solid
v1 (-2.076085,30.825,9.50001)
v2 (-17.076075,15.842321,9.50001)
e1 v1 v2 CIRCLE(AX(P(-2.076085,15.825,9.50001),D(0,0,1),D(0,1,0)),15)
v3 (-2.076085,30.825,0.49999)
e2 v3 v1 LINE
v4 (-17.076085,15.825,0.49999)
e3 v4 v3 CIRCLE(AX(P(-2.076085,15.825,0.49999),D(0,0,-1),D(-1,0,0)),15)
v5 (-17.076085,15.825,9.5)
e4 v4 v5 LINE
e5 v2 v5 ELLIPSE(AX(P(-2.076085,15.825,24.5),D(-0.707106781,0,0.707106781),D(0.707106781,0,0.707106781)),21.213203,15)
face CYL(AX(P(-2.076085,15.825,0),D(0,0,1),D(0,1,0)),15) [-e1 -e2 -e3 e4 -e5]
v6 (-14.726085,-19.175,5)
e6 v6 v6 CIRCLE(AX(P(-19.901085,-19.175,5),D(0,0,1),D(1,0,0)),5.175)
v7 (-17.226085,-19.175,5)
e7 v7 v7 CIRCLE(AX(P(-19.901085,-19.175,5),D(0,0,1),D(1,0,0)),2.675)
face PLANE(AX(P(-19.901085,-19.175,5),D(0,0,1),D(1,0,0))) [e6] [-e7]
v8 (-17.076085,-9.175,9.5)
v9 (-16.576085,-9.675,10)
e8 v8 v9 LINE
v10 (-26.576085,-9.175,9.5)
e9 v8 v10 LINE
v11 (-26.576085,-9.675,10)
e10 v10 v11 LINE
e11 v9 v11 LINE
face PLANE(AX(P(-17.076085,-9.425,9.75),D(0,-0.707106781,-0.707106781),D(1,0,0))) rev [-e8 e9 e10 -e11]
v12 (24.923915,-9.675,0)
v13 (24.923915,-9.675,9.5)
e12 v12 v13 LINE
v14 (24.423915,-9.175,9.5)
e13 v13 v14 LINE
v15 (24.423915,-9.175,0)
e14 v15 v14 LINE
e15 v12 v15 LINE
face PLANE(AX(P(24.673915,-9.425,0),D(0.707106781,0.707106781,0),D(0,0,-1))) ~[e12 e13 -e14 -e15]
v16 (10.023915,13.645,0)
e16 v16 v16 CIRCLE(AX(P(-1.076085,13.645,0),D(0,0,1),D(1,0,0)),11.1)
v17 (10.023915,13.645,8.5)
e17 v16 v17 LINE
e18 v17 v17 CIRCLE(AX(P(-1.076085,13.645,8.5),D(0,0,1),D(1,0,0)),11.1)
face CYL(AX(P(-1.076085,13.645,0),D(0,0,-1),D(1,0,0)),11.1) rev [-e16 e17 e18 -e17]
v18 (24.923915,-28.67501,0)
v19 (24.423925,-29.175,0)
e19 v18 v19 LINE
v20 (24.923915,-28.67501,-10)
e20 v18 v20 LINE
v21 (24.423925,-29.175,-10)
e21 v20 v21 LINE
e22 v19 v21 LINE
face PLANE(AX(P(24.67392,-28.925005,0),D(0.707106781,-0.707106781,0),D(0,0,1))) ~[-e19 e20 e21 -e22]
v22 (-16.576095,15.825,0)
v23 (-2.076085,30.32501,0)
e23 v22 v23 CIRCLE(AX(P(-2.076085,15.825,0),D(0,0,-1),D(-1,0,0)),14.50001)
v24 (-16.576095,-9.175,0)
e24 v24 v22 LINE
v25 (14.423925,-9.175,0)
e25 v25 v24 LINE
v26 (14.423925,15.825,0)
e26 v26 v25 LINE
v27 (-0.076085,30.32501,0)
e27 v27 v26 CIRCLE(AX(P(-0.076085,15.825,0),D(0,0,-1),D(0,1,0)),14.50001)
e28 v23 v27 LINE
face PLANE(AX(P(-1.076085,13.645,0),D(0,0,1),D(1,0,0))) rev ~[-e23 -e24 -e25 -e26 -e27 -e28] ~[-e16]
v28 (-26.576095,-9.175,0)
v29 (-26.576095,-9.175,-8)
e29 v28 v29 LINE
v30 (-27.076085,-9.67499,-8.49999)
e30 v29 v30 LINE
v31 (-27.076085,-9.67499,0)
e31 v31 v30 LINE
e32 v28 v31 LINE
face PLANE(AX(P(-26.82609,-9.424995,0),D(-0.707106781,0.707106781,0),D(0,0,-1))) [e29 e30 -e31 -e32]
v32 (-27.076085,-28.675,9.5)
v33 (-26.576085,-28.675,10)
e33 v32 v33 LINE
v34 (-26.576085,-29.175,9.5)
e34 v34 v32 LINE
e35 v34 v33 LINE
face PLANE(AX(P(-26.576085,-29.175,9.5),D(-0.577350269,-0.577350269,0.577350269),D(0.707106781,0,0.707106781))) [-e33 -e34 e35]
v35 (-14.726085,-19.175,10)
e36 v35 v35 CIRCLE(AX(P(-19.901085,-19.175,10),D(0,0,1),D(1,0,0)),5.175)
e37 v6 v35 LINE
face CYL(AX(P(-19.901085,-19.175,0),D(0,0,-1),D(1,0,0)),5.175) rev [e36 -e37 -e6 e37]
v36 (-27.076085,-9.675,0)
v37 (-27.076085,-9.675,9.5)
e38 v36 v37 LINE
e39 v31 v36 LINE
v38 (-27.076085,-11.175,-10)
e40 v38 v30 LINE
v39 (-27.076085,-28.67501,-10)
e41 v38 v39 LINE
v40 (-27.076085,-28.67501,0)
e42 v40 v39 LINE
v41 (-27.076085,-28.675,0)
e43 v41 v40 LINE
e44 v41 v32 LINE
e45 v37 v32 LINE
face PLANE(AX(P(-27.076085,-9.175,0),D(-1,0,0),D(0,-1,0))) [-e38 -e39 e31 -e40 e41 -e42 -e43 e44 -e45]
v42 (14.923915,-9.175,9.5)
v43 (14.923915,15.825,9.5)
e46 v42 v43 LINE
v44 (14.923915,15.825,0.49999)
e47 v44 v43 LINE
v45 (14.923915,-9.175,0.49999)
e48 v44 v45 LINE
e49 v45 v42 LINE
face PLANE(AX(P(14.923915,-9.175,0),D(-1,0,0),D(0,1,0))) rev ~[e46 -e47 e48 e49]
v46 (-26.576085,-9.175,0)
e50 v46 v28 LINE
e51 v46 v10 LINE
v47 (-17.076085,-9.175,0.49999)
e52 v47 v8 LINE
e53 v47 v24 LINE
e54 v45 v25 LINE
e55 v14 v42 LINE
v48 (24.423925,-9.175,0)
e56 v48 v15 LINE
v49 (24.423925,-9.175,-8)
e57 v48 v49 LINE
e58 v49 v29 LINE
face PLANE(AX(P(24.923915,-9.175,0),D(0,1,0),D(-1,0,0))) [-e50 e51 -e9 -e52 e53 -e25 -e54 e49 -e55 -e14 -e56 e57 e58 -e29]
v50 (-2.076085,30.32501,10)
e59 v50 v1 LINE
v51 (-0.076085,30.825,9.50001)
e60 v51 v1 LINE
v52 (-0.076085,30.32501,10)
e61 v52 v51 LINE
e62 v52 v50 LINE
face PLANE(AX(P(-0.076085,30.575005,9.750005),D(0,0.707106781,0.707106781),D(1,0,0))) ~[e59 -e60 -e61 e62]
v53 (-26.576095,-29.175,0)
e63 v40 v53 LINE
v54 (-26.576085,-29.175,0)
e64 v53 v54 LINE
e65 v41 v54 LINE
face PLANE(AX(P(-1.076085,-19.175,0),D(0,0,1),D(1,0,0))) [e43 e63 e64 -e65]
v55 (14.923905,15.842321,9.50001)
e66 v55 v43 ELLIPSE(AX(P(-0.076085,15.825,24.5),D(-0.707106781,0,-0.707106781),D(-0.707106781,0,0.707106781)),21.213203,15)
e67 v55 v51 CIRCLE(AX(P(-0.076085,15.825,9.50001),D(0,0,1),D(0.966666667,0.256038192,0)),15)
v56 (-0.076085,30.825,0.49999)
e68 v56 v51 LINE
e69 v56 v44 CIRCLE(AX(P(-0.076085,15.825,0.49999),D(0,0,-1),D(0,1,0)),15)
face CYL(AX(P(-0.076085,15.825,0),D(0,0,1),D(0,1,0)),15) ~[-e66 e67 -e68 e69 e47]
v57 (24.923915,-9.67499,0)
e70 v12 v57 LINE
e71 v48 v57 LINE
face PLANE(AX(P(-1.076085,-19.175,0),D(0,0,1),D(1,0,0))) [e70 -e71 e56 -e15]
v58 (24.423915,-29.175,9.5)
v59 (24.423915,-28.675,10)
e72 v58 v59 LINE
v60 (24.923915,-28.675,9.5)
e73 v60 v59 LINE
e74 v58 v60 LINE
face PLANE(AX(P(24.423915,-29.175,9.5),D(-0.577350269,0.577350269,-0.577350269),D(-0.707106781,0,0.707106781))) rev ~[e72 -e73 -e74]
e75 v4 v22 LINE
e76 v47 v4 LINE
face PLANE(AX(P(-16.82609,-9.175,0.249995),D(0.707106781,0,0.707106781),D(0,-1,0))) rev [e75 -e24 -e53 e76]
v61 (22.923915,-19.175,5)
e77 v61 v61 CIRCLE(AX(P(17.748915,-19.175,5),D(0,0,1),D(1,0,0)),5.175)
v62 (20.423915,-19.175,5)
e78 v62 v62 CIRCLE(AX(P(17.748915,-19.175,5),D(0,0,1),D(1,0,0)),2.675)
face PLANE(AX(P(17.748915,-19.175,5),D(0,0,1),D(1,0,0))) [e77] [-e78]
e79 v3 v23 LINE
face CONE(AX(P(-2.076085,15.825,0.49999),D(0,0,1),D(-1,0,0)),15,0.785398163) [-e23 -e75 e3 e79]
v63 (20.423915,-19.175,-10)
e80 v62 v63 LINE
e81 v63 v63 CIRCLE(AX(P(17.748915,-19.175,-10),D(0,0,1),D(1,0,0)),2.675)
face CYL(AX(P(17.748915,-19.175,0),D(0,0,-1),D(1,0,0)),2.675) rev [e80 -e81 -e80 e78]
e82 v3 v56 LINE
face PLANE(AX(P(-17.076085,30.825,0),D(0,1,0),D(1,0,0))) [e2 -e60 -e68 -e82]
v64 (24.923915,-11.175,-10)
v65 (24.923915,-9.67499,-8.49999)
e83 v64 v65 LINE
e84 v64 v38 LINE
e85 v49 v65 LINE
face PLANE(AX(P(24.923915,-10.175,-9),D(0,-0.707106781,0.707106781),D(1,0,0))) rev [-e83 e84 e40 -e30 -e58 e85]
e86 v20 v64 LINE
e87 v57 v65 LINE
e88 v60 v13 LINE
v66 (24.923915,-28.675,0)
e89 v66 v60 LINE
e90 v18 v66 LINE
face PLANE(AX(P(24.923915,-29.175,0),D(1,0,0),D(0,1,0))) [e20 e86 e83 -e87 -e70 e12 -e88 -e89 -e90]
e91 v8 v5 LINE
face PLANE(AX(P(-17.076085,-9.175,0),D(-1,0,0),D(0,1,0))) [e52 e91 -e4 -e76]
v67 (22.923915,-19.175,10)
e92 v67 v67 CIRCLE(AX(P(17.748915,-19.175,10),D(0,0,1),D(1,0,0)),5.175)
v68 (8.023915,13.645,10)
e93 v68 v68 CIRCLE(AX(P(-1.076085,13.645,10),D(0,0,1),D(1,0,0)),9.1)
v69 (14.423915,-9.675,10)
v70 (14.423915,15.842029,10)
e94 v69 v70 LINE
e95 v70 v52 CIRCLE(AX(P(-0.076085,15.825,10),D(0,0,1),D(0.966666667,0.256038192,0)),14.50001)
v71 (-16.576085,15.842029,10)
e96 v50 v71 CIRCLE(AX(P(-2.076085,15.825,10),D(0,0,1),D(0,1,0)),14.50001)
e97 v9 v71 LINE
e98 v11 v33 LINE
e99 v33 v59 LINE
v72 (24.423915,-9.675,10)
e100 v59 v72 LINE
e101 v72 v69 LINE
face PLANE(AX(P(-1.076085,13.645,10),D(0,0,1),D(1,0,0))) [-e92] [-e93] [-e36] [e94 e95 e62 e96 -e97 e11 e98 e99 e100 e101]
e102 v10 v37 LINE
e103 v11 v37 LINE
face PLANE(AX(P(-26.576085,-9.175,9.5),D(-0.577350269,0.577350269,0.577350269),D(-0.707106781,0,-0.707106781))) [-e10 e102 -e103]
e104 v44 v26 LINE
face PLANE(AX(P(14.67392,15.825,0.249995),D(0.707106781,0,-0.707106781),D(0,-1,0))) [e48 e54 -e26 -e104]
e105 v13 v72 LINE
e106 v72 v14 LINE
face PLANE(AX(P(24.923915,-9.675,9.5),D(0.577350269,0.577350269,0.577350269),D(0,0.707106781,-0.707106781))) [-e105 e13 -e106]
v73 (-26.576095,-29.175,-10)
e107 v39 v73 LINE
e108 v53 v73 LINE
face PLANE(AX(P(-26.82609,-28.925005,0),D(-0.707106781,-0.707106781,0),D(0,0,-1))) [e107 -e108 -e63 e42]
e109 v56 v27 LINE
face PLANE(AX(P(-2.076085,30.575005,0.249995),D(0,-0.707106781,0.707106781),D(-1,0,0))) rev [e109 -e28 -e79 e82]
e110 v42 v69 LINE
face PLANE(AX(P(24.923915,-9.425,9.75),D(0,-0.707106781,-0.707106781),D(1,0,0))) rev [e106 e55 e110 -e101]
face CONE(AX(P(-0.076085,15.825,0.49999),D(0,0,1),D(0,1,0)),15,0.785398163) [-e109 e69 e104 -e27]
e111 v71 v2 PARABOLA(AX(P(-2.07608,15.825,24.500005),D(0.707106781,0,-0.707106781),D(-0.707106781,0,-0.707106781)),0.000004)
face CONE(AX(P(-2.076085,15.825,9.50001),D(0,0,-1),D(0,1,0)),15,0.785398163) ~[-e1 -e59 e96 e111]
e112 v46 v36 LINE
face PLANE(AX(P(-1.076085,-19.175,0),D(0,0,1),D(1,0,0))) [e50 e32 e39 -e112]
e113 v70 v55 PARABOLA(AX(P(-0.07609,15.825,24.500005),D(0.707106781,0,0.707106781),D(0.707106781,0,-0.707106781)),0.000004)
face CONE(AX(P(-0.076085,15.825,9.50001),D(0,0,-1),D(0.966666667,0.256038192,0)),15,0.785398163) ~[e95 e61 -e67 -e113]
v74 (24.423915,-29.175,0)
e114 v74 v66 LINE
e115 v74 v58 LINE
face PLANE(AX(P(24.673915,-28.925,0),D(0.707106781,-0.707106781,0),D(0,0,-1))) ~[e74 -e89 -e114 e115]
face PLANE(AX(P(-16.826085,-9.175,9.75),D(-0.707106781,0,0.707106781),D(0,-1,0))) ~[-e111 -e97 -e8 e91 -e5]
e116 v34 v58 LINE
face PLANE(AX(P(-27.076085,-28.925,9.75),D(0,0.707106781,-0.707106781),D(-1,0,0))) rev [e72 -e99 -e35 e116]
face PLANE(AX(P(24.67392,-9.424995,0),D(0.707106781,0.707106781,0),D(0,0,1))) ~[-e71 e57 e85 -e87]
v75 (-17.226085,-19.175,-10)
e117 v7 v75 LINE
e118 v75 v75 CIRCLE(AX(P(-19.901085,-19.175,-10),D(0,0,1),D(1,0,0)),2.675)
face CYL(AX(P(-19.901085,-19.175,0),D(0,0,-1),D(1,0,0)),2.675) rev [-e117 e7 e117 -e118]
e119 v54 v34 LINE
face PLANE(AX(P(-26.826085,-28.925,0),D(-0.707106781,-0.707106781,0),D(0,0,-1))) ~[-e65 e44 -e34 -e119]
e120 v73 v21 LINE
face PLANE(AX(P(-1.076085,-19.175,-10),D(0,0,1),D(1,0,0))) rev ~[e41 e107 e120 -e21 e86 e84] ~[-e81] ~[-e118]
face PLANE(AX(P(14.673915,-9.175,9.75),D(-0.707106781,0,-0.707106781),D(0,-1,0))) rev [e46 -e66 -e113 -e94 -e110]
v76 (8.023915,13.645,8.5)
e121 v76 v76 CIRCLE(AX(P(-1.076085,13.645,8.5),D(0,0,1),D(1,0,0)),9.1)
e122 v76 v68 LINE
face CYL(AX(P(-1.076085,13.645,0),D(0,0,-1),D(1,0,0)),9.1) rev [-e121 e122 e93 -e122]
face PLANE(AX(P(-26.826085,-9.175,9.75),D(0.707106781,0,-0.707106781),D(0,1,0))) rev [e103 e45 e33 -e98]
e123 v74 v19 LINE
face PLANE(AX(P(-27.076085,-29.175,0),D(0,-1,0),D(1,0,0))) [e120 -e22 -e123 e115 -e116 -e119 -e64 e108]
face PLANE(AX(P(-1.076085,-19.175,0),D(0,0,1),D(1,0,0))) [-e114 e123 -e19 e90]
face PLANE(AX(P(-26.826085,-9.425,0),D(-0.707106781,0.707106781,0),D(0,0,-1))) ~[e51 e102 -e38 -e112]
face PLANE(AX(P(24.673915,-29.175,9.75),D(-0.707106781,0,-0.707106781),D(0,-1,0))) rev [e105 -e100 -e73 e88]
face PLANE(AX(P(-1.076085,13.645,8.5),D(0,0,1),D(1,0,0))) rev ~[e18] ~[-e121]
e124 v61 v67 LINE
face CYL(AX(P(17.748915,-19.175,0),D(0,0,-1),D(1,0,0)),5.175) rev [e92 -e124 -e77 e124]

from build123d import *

# Parameters (mm, degrees)
F0_W      = 32
F0_H      = 40
F0_R      = 11.1
F0_R_2    = 5.175
F1_DEPTH  = 10
F0_R_3    = 2.675
F2_DEPTH  = 5
F3_DEPTH  = 5
F4_SIZE   = 0.5
F5_DEPTH  = 10
F6_DEPTH  = 10
F8_SIZE   = 2
F0_R_4    = 9.1
F9_DEPTH  = 10
F10_DEPTH = 8.5
F11_R     = 15
F12_SIZE  = 0.49999


# Not quite as in the source:
# - a fillet or chamfer is up to 0.001 mm smaller than in the source, because OpenCascade refuses the exact size
# - a feature of the source that left no trace in its solid (it failed there, or was rolled back) is left out


with BuildPart() as f1:
    # F0 (on Top) → F1 (new body)
    with BuildSketch(Plane.XY):
        with Locations((-1.076085493, 10.825)):
            Rectangle(F0_W, F0_H)
        with Locations((-1.076085493, 13.645)):
            Circle(F0_R, mode=Mode.SUBTRACT)
        Polygon((14.923914507, -9.175), (-17.076085493, -9.175), (-27.076085493, -9.175), (-27.076085493, -29.175), (-17.076085493, -29.175), (14.923914507, -29.175), (24.923914507, -29.175), (24.923914507, -9.175), align=None)
        with Locations((-19.901085493, -19.175)):
            Circle(F0_R_2, mode=Mode.SUBTRACT)
        with Locations((17.748914507, -19.175)):
            Circle(F0_R_2, mode=Mode.SUBTRACT)
    extrude(amount=F1_DEPTH)

    # F0 (on Top) → F2 (join)
    with BuildSketch(Plane.XY):
        with Locations((-19.901085493, -19.175)):
            Circle(F0_R_2)
        with Locations((-19.901085493, -19.175)):
            Circle(F0_R_3, mode=Mode.SUBTRACT)
    extrude(amount=F2_DEPTH)

    # F0 (on Top) → F3 (join)
    with BuildSketch(Plane.XY):
        with Locations((17.748914507, -19.175)):
            Circle(F0_R_2)
        with Locations((17.748914507, -19.175)):
            Circle(F0_R_3, mode=Mode.SUBTRACT)
    extrude(amount=F3_DEPTH)

    # F4
    f4_edges = [f1.edges().sort_by_distance(p)[0] for p in [
        (-27.076085, -19.175, 10),
        (-22.076085, -9.175, 10),
        (19.923915, -9.175, 10),
        (24.923915, -19.175, 10),
        (24.923915, -9.175, 5),
        (-27.076085, -9.175, 5),
        (-27.076085, -29.175, 5),
        (24.923915, -29.175, 5),
        (-1.076085, -29.175, 10),
        (-17.076085, 10.825, 10),
        (14.923915, 10.825, 10),
    ]]
    chamfer(f4_edges, length=F4_SIZE)

    # F0 (on Top) → F5 (join)
    with BuildSketch(Plane.XY):
        Polygon((14.923914507, -9.175), (-17.076085493, -9.175), (-27.076085493, -9.175), (-27.076085493, -29.175), (-17.076085493, -29.175), (14.923914507, -29.175), (24.923914507, -29.175), (24.923914507, -9.175), align=None)
        with Locations((-19.901085493, -19.175)):
            Circle(F0_R_2, mode=Mode.SUBTRACT)
        with Locations((17.748914507, -19.175)):
            Circle(F0_R_2, mode=Mode.SUBTRACT)
    extrude(amount=-F5_DEPTH)

    # F0 (on Top) → F6 (join)
    with BuildSketch(Plane.XY):
        with Locations((17.748914507, -19.175)):
            Circle(F0_R_2)
        with Locations((17.748914507, -19.175)):
            Circle(F0_R_3, mode=Mode.SUBTRACT)
        with Locations((-19.901085493, -19.175)):
            Circle(F0_R_2)
        with Locations((-19.901085493, -19.175)):
            Circle(F0_R_3, mode=Mode.SUBTRACT)
    extrude(amount=-F6_DEPTH)

    # F8
    f8_edges = [f1.edges().sort_by_distance(p)[0] for p in [
        (-1.076085, -9.175, -10),
    ]]
    chamfer(f8_edges, length=F8_SIZE)

    # F0 (on Top) → F9 (join)
    with BuildSketch(Plane.XY):
        with Locations((-1.076085493, 13.645)):
            Circle(F0_R)
        with Locations((-1.076085493, 13.645)):
            Circle(F0_R_4, mode=Mode.SUBTRACT)
    extrude(amount=F9_DEPTH)

    # F0 (on Top) → F10 (cut)
    with BuildSketch(Plane.XY):
        with Locations((-1.076085493, 13.645)):
            Circle(F0_R)
        with Locations((-1.076085493, 13.645)):
            Circle(F0_R_4, mode=Mode.SUBTRACT)
    extrude(amount=F10_DEPTH, mode=Mode.SUBTRACT)

    # F11
    f11_edges = [f1.edges().sort_by_distance(p)[0] for p in [
        (14.923915, 30.825, 4.75),
        (-17.076085, 30.825, 4.75),
    ]]
    fillet(f11_edges, radius=F11_R)

    # F12 (size 0.5 in the source; OpenCascade refuses exactly that, so slightly less here)
    f12_edges = [f1.edges().sort_by_distance(p)[0] for p in [
        (10.530516, 26.431602, 0),
        (-11.224621, 27.712148, 10),
        (9.07245, 27.712148, 10),
        (-1.076085, 30.825, 10),
        (-1.076085, 30.825, 0),
        (-12.682687, 26.431602, 0),
        (-17.076085, 3.325, 0),
        (-27.076085, -9.175, -4),
        (24.923915, -9.175, -4),
        (14.923915, 3.325, 0),
        (-27.076085, -29.175, -5),
        (24.923915, -29.175, -5),
    ]]
    chamfer(f12_edges, length=F12_SIZE)


solid = f1.part
